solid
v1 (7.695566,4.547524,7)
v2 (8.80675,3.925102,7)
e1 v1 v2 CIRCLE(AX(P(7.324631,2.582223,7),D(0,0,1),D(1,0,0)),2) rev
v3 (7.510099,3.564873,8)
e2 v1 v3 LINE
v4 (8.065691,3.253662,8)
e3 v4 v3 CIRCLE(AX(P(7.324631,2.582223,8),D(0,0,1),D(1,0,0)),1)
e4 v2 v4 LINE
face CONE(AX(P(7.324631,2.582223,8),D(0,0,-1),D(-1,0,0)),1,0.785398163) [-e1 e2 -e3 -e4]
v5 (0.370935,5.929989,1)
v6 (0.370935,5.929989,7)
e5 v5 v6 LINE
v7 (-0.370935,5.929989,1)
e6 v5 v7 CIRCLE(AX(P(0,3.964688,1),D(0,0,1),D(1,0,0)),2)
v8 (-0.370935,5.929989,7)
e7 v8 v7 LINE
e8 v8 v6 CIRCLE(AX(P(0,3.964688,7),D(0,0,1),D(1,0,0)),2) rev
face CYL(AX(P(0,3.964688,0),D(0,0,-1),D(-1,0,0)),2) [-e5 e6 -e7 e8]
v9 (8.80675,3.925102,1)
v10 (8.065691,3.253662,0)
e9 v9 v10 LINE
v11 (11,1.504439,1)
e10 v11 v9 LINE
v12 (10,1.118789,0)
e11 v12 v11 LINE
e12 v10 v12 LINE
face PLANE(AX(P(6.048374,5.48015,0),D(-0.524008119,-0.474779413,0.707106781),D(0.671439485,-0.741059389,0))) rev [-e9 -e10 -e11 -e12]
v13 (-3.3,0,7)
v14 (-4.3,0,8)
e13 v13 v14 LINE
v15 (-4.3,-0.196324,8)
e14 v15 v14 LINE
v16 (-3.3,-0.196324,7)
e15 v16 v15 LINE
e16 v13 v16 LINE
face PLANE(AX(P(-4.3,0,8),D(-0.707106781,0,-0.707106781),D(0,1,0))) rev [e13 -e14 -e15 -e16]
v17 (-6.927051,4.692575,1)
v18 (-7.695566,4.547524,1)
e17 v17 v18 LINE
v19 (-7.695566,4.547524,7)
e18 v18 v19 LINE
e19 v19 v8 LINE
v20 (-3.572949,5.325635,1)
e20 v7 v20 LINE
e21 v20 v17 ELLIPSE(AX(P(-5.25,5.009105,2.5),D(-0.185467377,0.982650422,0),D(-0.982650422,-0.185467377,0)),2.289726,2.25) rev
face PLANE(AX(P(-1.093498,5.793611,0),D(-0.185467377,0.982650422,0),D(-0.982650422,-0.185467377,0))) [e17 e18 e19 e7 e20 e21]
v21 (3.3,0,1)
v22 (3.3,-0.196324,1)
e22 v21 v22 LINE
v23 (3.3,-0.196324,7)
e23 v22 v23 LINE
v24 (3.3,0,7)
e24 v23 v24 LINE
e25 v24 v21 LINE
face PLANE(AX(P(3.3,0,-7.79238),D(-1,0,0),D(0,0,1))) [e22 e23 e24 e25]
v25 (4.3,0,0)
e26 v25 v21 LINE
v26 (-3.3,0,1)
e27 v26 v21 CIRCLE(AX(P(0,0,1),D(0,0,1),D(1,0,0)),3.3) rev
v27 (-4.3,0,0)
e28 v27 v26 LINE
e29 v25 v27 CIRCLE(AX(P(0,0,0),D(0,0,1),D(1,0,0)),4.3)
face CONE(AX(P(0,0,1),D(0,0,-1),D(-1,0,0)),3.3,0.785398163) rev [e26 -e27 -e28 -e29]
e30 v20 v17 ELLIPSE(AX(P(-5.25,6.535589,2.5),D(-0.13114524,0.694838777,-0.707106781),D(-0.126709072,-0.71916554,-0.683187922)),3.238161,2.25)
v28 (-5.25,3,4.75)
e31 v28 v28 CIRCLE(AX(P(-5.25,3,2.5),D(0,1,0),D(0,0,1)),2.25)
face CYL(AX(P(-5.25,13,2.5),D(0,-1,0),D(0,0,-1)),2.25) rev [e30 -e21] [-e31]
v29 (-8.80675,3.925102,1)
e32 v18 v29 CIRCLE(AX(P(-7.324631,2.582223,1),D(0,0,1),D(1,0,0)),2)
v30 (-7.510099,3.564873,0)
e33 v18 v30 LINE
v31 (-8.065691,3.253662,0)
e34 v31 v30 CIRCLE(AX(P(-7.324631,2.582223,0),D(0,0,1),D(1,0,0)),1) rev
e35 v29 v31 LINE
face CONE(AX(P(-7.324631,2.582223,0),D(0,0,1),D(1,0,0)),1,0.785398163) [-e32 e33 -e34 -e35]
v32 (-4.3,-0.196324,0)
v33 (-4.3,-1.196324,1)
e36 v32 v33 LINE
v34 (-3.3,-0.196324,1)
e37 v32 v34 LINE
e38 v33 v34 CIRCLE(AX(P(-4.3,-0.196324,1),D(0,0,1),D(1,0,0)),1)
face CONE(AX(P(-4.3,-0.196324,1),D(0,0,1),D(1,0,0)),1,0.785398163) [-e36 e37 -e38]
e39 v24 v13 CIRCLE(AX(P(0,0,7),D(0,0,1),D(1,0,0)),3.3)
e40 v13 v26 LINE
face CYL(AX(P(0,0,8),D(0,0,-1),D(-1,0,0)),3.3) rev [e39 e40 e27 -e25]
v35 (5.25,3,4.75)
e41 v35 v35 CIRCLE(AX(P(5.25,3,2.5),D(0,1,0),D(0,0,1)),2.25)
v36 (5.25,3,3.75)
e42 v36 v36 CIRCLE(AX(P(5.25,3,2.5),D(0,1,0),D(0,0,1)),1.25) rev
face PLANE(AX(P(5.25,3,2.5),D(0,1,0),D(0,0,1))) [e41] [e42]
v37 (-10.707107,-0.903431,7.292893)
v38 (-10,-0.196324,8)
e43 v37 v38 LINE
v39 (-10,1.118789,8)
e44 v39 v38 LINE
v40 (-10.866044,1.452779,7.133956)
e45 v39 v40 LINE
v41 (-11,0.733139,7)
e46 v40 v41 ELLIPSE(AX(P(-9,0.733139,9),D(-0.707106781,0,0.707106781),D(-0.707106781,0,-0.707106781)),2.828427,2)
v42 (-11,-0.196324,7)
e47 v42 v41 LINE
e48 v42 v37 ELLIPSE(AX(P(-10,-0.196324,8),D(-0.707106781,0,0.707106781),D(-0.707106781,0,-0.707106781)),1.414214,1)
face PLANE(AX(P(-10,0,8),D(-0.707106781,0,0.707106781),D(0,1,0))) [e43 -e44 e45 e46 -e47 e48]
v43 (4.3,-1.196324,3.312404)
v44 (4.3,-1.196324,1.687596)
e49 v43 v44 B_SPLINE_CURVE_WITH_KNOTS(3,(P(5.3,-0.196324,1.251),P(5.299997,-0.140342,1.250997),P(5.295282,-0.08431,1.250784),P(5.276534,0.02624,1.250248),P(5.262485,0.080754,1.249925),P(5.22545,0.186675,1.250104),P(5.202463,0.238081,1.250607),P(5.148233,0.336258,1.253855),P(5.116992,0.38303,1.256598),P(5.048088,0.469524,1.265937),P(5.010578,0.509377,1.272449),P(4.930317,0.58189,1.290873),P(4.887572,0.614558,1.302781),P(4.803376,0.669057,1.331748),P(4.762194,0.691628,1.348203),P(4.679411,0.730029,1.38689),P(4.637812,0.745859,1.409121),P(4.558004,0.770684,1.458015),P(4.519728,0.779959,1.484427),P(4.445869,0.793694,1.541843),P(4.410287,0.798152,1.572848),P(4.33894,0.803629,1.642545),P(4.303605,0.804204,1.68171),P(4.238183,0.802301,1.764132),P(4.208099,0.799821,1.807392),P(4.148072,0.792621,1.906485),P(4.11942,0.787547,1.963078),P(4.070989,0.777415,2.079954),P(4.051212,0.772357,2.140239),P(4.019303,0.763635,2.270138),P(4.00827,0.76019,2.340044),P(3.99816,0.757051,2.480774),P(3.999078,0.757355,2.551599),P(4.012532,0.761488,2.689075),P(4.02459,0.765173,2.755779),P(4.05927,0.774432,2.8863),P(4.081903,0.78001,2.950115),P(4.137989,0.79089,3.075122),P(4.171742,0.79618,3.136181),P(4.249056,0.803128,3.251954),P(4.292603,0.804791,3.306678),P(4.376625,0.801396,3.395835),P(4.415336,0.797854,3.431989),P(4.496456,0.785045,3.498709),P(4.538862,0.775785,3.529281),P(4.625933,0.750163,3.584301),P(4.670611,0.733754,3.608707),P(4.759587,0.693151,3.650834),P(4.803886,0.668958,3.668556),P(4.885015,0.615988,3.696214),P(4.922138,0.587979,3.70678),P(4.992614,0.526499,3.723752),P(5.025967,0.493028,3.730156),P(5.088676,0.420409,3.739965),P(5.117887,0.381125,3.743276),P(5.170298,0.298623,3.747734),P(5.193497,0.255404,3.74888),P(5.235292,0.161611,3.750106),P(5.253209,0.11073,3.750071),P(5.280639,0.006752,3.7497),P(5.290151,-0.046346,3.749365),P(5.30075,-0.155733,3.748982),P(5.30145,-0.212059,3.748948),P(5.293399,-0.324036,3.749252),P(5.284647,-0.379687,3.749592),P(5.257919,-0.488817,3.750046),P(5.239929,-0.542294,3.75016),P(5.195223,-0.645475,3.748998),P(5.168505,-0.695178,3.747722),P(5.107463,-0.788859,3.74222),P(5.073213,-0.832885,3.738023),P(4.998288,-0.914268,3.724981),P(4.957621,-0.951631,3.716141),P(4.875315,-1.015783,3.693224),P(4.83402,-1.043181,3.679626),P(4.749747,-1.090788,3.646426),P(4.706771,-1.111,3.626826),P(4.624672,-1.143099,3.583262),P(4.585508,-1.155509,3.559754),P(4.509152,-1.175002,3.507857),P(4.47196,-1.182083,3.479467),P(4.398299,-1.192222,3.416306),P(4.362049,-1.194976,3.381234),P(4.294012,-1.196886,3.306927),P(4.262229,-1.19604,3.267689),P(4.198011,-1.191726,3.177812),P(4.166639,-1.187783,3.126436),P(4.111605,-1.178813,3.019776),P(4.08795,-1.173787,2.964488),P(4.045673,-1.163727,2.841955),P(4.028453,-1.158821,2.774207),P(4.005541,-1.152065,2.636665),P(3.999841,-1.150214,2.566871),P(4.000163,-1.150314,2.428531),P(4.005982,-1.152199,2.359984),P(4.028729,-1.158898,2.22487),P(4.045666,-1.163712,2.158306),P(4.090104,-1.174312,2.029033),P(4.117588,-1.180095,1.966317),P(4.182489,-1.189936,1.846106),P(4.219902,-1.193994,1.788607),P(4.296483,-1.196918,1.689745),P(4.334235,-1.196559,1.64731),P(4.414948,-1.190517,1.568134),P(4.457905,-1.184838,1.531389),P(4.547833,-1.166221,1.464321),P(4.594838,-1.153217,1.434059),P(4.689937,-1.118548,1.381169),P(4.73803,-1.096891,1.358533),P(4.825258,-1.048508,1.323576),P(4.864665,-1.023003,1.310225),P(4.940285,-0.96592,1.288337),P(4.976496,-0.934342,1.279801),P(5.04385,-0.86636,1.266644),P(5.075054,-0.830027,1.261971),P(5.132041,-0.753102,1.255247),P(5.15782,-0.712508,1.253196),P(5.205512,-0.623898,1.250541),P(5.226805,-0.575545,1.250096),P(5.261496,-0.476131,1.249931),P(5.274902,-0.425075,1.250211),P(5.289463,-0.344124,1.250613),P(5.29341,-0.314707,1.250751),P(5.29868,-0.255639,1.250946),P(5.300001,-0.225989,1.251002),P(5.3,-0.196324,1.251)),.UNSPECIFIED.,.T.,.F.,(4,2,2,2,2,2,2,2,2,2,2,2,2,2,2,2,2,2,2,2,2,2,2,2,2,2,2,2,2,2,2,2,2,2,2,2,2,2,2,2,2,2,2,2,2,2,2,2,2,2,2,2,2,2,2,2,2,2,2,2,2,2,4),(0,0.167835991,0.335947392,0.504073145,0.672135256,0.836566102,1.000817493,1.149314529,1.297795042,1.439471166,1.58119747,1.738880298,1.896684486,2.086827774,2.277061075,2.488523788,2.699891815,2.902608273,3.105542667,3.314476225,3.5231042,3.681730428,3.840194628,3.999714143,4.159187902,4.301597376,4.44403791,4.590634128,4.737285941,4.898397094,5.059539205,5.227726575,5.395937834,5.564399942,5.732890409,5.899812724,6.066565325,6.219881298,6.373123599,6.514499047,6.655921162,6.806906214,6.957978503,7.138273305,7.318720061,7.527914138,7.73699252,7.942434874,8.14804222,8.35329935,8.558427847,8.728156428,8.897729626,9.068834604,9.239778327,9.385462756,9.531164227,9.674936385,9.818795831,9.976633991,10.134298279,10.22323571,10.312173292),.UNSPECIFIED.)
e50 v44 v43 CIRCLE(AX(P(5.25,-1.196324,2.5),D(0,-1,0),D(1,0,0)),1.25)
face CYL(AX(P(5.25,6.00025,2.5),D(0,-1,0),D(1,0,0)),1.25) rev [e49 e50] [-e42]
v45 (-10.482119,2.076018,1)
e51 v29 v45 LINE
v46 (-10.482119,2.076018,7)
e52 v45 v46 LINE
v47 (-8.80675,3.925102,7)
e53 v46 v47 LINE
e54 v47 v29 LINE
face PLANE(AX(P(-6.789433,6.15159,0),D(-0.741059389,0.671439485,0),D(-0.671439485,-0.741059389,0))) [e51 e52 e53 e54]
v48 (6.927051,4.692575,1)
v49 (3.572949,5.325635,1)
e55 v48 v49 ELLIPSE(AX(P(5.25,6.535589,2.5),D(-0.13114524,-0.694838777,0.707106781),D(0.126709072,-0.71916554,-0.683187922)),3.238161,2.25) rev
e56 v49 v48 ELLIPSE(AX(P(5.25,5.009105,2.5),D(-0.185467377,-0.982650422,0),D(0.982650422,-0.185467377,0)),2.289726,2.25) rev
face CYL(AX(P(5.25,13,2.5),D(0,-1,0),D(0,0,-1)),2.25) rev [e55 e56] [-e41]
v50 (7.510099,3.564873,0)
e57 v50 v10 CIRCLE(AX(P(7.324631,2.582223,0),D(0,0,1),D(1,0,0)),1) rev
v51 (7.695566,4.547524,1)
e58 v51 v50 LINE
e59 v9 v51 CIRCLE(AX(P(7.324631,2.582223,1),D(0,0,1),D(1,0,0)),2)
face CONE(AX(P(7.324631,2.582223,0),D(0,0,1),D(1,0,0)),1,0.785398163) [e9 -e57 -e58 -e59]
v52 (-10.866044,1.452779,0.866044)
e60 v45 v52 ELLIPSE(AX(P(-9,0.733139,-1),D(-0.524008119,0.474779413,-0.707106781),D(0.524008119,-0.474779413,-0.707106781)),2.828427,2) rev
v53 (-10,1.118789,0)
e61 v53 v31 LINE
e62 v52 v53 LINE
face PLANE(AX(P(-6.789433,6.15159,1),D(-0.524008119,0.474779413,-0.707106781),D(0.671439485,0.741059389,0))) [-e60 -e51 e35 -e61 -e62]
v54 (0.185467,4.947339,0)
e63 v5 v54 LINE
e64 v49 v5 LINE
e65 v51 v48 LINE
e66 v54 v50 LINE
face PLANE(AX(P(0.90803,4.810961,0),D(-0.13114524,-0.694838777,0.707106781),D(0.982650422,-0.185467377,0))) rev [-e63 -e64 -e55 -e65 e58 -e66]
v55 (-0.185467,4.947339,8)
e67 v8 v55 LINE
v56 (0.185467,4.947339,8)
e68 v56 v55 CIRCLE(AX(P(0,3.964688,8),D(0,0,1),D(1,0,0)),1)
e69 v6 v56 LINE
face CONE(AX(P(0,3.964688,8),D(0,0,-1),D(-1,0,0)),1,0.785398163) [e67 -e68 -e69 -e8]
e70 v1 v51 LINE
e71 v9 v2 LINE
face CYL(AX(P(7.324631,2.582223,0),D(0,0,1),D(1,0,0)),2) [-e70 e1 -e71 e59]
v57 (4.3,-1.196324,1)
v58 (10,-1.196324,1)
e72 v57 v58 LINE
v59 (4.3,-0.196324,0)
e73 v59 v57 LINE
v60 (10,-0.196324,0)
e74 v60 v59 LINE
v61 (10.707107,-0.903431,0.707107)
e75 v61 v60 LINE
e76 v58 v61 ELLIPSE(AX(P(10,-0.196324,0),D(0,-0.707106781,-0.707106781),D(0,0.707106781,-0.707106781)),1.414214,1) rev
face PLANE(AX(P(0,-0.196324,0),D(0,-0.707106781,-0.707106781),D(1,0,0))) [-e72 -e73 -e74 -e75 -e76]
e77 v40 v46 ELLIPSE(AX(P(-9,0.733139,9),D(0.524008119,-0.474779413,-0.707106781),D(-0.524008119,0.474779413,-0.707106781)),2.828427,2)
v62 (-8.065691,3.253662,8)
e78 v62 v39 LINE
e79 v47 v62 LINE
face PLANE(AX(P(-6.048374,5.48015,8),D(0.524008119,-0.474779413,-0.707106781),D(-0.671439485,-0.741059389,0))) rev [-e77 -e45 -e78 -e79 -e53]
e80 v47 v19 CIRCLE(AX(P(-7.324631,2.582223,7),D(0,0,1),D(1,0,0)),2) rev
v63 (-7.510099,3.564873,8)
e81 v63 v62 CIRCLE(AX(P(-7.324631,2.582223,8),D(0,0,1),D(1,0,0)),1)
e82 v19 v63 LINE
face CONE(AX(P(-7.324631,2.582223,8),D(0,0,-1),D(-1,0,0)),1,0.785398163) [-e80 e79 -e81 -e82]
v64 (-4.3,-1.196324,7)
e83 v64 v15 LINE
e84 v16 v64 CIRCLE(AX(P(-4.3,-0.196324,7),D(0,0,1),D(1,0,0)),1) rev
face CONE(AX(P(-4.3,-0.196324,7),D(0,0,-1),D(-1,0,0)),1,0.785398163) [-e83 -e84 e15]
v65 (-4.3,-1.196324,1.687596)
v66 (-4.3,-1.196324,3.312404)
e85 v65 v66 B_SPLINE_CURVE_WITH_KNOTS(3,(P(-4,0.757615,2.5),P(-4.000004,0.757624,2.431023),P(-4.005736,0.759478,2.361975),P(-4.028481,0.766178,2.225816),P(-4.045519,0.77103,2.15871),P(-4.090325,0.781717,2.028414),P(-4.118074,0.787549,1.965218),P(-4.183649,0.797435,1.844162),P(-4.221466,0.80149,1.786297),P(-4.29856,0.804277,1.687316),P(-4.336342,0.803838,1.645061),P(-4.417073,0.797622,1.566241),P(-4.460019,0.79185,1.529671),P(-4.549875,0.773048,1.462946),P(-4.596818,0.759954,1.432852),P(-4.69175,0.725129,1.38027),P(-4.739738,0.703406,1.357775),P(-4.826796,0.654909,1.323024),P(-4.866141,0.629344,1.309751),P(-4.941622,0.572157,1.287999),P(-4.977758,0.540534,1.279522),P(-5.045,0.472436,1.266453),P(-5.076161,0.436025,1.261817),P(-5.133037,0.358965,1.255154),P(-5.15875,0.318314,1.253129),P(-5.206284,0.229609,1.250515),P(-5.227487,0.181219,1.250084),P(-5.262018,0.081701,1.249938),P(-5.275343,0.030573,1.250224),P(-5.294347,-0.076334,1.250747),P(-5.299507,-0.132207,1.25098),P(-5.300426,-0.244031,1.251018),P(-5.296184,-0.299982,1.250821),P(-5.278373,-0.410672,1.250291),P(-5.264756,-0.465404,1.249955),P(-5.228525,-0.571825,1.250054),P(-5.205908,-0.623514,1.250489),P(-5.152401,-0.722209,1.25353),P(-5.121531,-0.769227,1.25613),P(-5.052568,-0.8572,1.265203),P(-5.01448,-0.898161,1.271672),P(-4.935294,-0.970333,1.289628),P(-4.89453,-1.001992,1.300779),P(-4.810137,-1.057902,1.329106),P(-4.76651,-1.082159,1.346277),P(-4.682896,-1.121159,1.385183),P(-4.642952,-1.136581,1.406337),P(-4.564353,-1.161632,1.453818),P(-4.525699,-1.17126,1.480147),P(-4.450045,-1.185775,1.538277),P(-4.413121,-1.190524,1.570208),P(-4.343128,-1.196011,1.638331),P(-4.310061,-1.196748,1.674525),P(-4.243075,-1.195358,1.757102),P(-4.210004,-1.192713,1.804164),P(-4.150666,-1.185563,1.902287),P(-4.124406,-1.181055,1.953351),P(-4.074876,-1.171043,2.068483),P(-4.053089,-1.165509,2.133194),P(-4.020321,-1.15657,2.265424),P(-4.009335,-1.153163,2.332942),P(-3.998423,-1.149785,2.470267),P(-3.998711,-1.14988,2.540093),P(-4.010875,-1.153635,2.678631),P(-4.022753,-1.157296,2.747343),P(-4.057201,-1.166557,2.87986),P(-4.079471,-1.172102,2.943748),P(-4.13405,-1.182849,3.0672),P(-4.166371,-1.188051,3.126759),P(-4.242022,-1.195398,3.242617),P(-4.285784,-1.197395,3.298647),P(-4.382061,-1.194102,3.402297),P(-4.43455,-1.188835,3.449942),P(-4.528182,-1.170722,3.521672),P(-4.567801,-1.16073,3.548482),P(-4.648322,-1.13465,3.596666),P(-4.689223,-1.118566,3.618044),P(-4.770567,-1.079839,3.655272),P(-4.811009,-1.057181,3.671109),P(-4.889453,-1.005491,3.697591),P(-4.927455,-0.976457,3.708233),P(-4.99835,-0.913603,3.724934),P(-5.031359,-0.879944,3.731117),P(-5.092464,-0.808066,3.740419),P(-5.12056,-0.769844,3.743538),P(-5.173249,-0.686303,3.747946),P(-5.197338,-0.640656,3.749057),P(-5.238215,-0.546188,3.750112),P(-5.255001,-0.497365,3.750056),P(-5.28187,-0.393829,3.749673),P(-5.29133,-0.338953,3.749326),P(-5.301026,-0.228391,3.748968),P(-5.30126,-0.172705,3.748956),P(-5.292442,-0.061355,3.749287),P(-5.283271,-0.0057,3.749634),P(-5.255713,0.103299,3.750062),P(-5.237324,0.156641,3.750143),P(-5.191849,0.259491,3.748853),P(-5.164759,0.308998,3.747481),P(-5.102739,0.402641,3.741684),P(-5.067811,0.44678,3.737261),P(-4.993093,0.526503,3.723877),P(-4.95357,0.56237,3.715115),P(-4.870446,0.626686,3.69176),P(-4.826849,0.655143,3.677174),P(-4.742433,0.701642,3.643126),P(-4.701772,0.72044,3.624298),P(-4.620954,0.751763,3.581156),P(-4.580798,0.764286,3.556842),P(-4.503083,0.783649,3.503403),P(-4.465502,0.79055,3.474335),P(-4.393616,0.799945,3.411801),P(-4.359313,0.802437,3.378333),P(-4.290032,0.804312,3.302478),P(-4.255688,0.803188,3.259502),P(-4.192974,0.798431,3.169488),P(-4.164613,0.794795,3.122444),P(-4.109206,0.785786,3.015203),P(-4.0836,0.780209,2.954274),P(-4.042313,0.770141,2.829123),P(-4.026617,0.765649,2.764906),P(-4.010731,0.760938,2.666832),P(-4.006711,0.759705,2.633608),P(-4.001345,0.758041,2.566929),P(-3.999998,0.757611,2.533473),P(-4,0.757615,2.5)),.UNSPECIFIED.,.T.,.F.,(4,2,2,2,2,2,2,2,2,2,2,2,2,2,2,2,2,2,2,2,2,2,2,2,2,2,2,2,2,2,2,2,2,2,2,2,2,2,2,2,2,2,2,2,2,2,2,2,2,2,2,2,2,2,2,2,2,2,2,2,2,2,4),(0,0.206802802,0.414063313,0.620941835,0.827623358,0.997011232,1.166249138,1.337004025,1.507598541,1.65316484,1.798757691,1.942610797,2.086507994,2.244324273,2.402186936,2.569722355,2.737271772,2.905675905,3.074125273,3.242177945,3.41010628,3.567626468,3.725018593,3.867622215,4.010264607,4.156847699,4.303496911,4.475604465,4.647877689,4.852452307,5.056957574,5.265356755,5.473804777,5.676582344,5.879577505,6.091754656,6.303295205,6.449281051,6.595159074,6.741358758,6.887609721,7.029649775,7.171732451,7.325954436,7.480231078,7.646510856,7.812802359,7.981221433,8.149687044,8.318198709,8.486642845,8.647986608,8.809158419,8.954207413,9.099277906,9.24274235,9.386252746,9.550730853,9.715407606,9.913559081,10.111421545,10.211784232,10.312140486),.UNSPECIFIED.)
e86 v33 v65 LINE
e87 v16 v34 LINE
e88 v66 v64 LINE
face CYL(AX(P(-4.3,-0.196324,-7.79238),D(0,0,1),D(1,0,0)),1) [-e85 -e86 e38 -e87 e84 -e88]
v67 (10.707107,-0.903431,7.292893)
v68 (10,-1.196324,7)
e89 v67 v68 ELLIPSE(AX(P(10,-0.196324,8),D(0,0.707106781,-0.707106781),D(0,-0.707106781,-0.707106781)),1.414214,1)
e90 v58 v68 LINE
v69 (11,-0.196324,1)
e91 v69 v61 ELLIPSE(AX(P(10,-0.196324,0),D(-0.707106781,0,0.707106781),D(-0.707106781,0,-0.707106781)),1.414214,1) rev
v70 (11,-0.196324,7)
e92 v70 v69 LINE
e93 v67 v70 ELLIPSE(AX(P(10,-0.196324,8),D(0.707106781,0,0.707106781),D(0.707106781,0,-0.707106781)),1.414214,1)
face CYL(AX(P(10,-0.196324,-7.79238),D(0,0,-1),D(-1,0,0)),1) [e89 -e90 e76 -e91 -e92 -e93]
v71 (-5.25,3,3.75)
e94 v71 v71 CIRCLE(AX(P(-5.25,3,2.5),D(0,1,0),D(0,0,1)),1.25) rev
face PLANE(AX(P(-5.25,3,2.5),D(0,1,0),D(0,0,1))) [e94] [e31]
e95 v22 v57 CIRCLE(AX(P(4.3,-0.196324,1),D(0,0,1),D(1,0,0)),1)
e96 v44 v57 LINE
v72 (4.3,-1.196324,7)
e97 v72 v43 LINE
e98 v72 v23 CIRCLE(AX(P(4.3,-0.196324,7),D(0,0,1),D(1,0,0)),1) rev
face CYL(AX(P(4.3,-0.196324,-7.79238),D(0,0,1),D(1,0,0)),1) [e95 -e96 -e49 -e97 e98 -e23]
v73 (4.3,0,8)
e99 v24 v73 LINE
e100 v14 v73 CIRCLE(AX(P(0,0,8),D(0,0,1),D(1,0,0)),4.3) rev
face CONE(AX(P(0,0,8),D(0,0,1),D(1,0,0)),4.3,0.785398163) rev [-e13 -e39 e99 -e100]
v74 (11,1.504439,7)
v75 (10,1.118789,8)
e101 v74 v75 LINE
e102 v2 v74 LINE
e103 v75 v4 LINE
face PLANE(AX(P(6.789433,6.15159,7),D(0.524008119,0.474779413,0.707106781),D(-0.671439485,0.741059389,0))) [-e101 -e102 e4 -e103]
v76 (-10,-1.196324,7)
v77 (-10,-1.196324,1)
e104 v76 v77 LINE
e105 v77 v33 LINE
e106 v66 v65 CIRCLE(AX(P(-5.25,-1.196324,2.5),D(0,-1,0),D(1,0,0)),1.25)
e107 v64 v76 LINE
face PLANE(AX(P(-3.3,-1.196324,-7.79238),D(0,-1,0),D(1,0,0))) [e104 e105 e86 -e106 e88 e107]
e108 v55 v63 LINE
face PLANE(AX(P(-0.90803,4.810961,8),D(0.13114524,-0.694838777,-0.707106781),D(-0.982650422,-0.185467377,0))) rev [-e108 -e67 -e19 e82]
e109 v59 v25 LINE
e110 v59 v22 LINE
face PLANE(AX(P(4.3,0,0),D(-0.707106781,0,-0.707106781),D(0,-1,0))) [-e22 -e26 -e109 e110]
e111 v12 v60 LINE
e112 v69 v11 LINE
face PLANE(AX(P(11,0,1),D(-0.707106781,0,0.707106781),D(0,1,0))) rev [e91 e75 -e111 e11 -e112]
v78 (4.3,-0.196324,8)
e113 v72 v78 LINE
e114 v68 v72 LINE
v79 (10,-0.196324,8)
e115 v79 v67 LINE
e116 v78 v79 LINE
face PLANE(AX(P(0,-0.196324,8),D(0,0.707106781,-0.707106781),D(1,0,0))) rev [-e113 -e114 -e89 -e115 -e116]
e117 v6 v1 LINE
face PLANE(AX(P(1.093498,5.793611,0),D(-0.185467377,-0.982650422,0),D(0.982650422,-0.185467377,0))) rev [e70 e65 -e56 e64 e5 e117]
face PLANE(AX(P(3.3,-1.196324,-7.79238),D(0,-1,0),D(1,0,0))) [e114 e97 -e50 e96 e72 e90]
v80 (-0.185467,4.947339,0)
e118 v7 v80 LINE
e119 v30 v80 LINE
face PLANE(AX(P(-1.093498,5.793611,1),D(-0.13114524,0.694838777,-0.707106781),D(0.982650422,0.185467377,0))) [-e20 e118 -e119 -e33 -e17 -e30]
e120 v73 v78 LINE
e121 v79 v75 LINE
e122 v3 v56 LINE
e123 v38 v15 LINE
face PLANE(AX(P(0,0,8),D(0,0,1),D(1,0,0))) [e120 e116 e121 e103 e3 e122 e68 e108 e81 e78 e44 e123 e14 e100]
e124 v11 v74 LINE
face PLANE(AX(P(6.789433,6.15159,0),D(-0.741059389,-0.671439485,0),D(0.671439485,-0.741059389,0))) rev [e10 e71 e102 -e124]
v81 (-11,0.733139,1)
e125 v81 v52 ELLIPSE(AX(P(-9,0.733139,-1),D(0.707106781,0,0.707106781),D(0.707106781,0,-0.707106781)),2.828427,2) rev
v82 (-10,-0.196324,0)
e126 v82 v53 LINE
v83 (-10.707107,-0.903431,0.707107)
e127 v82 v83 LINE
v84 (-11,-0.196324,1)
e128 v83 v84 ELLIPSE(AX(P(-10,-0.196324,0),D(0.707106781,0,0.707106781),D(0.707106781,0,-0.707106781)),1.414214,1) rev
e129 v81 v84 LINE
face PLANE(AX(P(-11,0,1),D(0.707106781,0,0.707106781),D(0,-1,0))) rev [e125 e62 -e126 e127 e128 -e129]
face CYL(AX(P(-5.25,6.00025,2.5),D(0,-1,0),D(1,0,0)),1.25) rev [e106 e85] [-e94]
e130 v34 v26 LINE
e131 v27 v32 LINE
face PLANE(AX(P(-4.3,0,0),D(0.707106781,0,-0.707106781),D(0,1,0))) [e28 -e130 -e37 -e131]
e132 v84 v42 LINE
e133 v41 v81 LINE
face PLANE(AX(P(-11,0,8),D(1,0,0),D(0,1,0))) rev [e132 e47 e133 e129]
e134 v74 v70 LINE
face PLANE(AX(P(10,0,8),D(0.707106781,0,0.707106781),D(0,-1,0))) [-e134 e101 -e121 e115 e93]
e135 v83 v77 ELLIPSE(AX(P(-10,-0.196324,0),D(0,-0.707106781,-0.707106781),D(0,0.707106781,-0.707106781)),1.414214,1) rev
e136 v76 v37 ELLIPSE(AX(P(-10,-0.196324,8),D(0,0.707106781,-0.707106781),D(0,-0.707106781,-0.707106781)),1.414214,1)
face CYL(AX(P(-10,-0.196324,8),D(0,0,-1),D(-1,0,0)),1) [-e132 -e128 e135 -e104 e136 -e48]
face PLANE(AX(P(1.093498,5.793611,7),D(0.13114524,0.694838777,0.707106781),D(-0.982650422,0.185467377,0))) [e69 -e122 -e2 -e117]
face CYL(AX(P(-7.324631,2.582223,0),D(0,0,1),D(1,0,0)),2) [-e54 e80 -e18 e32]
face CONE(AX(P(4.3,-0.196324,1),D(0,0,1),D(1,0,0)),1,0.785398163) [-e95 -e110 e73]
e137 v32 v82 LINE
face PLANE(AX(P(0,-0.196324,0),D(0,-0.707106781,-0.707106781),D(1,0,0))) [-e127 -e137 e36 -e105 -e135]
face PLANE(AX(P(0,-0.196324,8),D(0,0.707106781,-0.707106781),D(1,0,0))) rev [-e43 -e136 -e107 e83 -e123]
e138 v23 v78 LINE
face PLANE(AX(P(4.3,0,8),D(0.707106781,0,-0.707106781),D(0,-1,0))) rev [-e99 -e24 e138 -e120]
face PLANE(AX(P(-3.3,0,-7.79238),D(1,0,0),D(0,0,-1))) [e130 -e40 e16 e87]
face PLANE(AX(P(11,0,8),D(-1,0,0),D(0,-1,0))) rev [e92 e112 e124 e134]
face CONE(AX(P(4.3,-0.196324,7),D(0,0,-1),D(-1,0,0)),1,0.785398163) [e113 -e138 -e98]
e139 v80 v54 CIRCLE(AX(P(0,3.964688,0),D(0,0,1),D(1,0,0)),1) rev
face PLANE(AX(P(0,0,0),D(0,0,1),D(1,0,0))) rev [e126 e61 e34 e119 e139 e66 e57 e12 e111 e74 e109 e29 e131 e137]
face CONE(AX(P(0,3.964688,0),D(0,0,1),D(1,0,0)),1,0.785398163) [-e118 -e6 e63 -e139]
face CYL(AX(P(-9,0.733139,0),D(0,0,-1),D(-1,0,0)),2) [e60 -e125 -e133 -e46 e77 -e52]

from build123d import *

# Parameters (mm, degrees)
BOSS_EXTRUDE1_DEPTH     = 8
CUT_EXTRUDE1_DEPTH      = 15.866068747
CUT_EXTRUDE1_DEPTH_BACK = 15.866068747
SKETCH3_W               = 7.7
SKETCH3_H               = 1.196323822
BOSS_EXTRUDE2_DEPTH     = 8
CHAMFER1_SIZE           = 1
FILLET1_R               = 1
SKETCH4_R               = 1.25
CUT_EXTRUDE2_DEPTH      = 16.387887332
CUT_EXTRUDE3_START      = 3
SKETCH5_R               = 2.25
CUT_EXTRUDE3_DEPTH      = 10
FILLET2_R               = 2
FILLET3_R               = 1
CHAMFER2_SIZE           = 1


# Some blends are built 0.0001 mm under size
with BuildPart() as part:
    # Sketch1 → Boss-Extrude1 (new body)
    with BuildSketch(Plane.XY):
        with BuildLine():
            Line((-3.3, 0), (-11, 0))
            Line((-11, 0), (-11, 6))
            Line((-11, 6), (11, 6))
            Line((11, 6), (11, 0))
            Line((11, 0), (3.3, 0))
            ThreePointArc((3.3, 0), (0, 3.3), (-3.3, 0))
        make_face()
    extrude(amount=BOSS_EXTRUDE1_DEPTH)

    # Sketch2 → Cut-Extrude1 (cut, two sides: drawn at the far end of the back side and taken through both)
    with BuildSketch(Plane.XY.offset(8).offset(-CUT_EXTRUDE1_DEPTH_BACK)):
        Polygon((-8.355690819, 4.422930452), (0, 6), (-11, 6), (-11, 1.504439372), align=None)
        Polygon((11, 6), (0, 6), (8.355690819, 4.422930452), (11, 1.504439372), align=None)
    extrude(amount=CUT_EXTRUDE1_DEPTH + CUT_EXTRUDE1_DEPTH_BACK, mode=Mode.SUBTRACT)

    # Sketch3 → Boss-Extrude2 (add)
    with BuildSketch(Plane.XY.offset(8)):
        with Locations((-7.15, -0.598161911)):
            Rectangle(SKETCH3_W, SKETCH3_H)
        with Locations((7.15, -0.598161911)):
            Rectangle(SKETCH3_W, SKETCH3_H)
    extrude(amount=-BOSS_EXTRUDE2_DEPTH)

    # Chamfer1
    chamfer1_edges = [part.edges().sort_by_distance(p)[0] for p in [
        (11, 0.154057775, 8),
        (-11, 0.154057775, 0),
        (-11, 0.154057775, 8),
        (11, 0.154057775, 0),
    ]]
    chamfer(chamfer1_edges, length=CHAMFER1_SIZE)

    # Fillet1
    fillet1_edges = [part.edges().sort_by_distance(p)[0] for p in [
        (-3.3, -1.196323822, 4),
        (3.3, -1.196323822, 4),
    ]]
    fillet(fillet1_edges, radius=FILLET1_R)

    # Sketch4 → Cut-Extrude2 (cut, through all)
    with BuildSketch(Plane.XZ.offset(1.196323822)):
        with Locations(Location((-5.25, 2.5, 0), (0, 0, 319.464197889))):
            Circle(SKETCH4_R)
        with Locations((5.25, 2.5)):
            Circle(SKETCH4_R)
    extrude(amount=-CUT_EXTRUDE2_DEPTH, mode=Mode.SUBTRACT)

    # Sketch5 → Cut-Extrude3 (cut)
    with BuildSketch(Plane(origin=(0, 0, 0), x_dir=(1, 0, 0), z_dir=(0, 1, 0)).offset(CUT_EXTRUDE3_START)):
        with Locations(Location((-5.25, -2.5, 0), (0, 0, 180))):
            Circle(SKETCH5_R)
        with Locations((5.25, -2.5)):
            Circle(SKETCH5_R)
    extrude(amount=CUT_EXTRUDE3_DEPTH, mode=Mode.SUBTRACT)

    # Fillet2
    fillet2_edges = [part.edges().sort_by_distance(p)[0] for p in [
        (8.355690819, 4.422930452, 4),
        (-8.355690819, 4.422930452, 4),
        (0, 6, 4),
        (-11, 1.504439372, 4),
    ]]
    fillet(fillet2_edges, radius=FILLET2_R)

    # Fillet3
    fillet3_edges = [part.edges().sort_by_distance(p)[0] for p in [
        (11, -1.196323822, 4),
        (-11, -1.196323822, 4),
    ]]
    fillet(fillet3_edges, radius=FILLET3_R)

    # Chamfer2
    chamfer2_edges = [part.edges().sort_by_distance(p)[0] for p in [
        (7.15, -1.196323822, 8),
        (3.592893219, -0.903430603, 8),
        (3.3, -0.098161911, 8),
        (0, 3.3, 8),
        (-3.3, -0.098161911, 8),
        (-3.592893219, -0.903430603, 8),
        (-7.15, -1.196323822, 8),
    ]]
    chamfer(chamfer2_edges, length=CHAMFER2_SIZE - 0.0001)  # a hair under: the kernel refuses the full size
    chamfer2_2_edges = [part.edges().sort_by_distance(p)[0] for p in [
        (7.15, -1.196323822, 0),
        (3.592893219, -0.903430603, 0),
        (3.3, -0.098161911, 0),
        (0, 3.3, 0),
        (-3.3, -0.098161911, 0),
        (-3.592893219, -0.903430603, 0),
        (-7.15, -1.196323822, 0),
    ]]
    chamfer(chamfer2_2_edges, length=CHAMFER2_SIZE - 0.0001)  # a hair under: the kernel refuses the full size
    # the kernel refuses this chamfer: 1 mm, written as the material it takes off along each edge
    with BuildSketch(Plane(origin=(8.806750236, 3.925101796, 0), x_dir=(-0.7407792072905057, -0.6711856247085939, -0.02749587661058639), z_dir=(0.6714394846228174, -0.7410593893133298, 0)), Plane(origin=(-11.7267295, 0.702357082, 0), x_dir=(0.7407792072905062, -0.6711856247085936, -0.02749587661058639), z_dir=(0.6714394846228171, 0.7410593893133303, 0))) as chamfer2_3_piece_1:
        with BuildLine():
            Line((1.028673195, 0), (-0.056547155, -1.027117794))
            Line((-0.056547155, -1.027117794), (-0.076539593, -1.026567876))
            ThreePointArc((-0.076539593, -1.026567876), (-0.034129227, -0.51339783), (-0.019992438, 0.000549918))
            Line((-0.019992438, 0.000549918), (0.000549918, 0.019992438))
            ThreePointArc((0.000549918, 0.019992438), (0.514497665, 0.00585565), (1.029223113, 0.019992438))
            Line((1.029223113, 0.019992438), (1.028673195, 0))
        make_face()
    extrude(amount=4.348834602, mode=Mode.SUBTRACT)
    with BuildSketch(Plane(origin=(7.324631458, 2.582222827, 0), x_dir=(0.7410593893133297, 0.6714394846228176, 0), z_dir=(0.6714394846228176, -0.7410593893133297, 0))) as chamfer2_3_piece_2:
        with BuildLine():
            Line((0.971715729, -0.028284271), (2.028284271, 1.028284271))
            Line((2.028284271, 1.028284271), (2.048284271, 1.028284271))
            ThreePointArc((2.048284271, 1.028284271), (2.02, 0.514142136), (2.02, 0))
            Line((2.02, 0), (2, -0.02))
            ThreePointArc((2, -0.02), (1.485857864, -0.02), (0.971715729, -0.048284271))
            Line((0.971715729, -0.048284271), (0.971715729, -0.028284271))
        make_face()
    revolve(axis=Axis((7.324631458, 2.582222827, 0), (0, 0, 1)), revolution_arc=37.133354948, mode=Mode.SUBTRACT)
    with BuildSketch(Plane(origin=(0.370934753, 5.929989044, 0), x_dir=(-0.18539725465470863, -0.9822788986514536, -0.02749587661058548), z_dir=(0.9826504221581788, -0.1854673767333577, 0)), Plane(origin=(-7.695566211, 4.547523671, 0), x_dir=(0.18539725465470863, -0.9822788986514536, -0.0274958766105855), z_dir=(0.9826504221581788, 0.1854673767333577, 0))) as chamfer2_3_piece_3:
        with BuildLine():
            Line((1.028673195, 0), (-0.056547155, -1.027117794))
            Line((-0.056547155, -1.027117794), (-0.076539593, -1.026567876))
            ThreePointArc((-0.076539593, -1.026567876), (-0.034129227, -0.51339783), (-0.019992438, 0.000549918))
            Line((-0.019992438, 0.000549918), (0.000549918, 0.019992438))
            ThreePointArc((0.000549918, 0.019992438), (0.514497665, 0.00585565), (1.029223113, 0.019992438))
            Line((1.029223113, 0.019992438), (1.028673195, 0))
        make_face()
    extrude(amount=7.45395442, mode=Mode.SUBTRACT)
    with BuildSketch(Plane(origin=(0, 3.964688199, 0), x_dir=(0.1854673767333581, 0.9826504221581787, 0), z_dir=(0.9826504221581787, -0.1854673767333581, 0))) as chamfer2_3_piece_4:
        with BuildLine():
            Line((0.971715729, -0.028284271), (2.028284271, 1.028284271))
            Line((2.028284271, 1.028284271), (2.048284271, 1.028284271))
            ThreePointArc((2.048284271, 1.028284271), (2.02, 0.514142136), (2.02, 0))
            Line((2.02, 0), (2, -0.02))
            ThreePointArc((2, -0.02), (1.485857864, -0.02), (0.971715729, -0.048284271))
            Line((0.971715729, -0.048284271), (0.971715729, -0.028284271))
        make_face()
    revolve(axis=Axis((0, 3.964688199, 0), (0, 0, 1)), revolution_arc=21.376765384, mode=Mode.SUBTRACT)
    with BuildSketch(Plane(origin=(-7.324631458, 2.582222827, 0), x_dir=(-0.1854673767333579, 0.9826504221581787, 0), z_dir=(0.9826504221581787, 0.1854673767333579, 0))) as chamfer2_3_piece_5:
        with BuildLine():
            Line((0.971715729, -0.028284271), (2.028284271, 1.028284271))
            Line((2.028284271, 1.028284271), (2.048284271, 1.028284271))
            ThreePointArc((2.048284271, 1.028284271), (2.02, 0.514142136), (2.02, 0))
            Line((2.02, 0), (2, -0.02))
            ThreePointArc((2, -0.02), (1.485857864, -0.02), (0.971715729, -0.048284271))
            Line((0.971715729, -0.048284271), (0.971715729, -0.028284271))
        make_face()
    revolve(axis=Axis((-7.324631458, 2.582222827, 0), (0, 0, 1)), revolution_arc=37.133354948, mode=Mode.SUBTRACT)
    # the kernel refuses this chamfer: 1 mm, written as the material it takes off along each edge
    with BuildSketch(Plane(origin=(8.806750236, 3.925101796, 8), x_dir=(-0.7407792072905057, -0.6711856247085939, 0.02749587661058564), z_dir=(0.6714394846228174, -0.7410593893133298, 0)), Plane(origin=(-11.7267295, 0.702357082, 8), x_dir=(0.740779207290506, -0.6711856247085934, 0.027495876610585612), z_dir=(0.6714394846228171, 0.7410593893133303, 0))) as chamfer2_4_piece_1:
        with BuildLine():
            Line((1.028673195, 0), (-0.056547155, 1.027117794))
            Line((-0.056547155, 1.027117794), (-0.076539593, 1.026567876))
            ThreePointArc((-0.076539593, 1.026567876), (-0.034129227, 0.51339783), (-0.019992438, -0.000549918))
            Line((-0.019992438, -0.000549918), (0.000549918, -0.019992438))
            ThreePointArc((0.000549918, -0.019992438), (0.514497665, -0.00585565), (1.029223113, -0.019992438))
            Line((1.029223113, -0.019992438), (1.028673195, 0))
        make_face()
    extrude(amount=4.348834602, mode=Mode.SUBTRACT)
    with BuildSketch(Plane(origin=(7.324631458, 2.582222827, 8), x_dir=(0.7410593893133297, 0.6714394846228176, 0), z_dir=(0.6714394846228176, -0.7410593893133297, 0))) as chamfer2_4_piece_2:
        with BuildLine():
            Line((0.971715729, 0.028284271), (2.028284271, -1.028284271))
            Line((2.028284271, -1.028284271), (2.048284271, -1.028284271))
            ThreePointArc((2.048284271, -1.028284271), (2.02, -0.514142136), (2.02, 0))
            Line((2.02, 0), (2, 0.02))
            ThreePointArc((2, 0.02), (1.485857864, 0.02), (0.971715729, 0.048284271))
            Line((0.971715729, 0.048284271), (0.971715729, 0.028284271))
        make_face()
    revolve(axis=Axis((7.324631458, 2.582222827, 8), (0, 0, 1)), revolution_arc=37.133354948, mode=Mode.SUBTRACT)
    with BuildSketch(Plane(origin=(0.370934753, 5.929989044, 8), x_dir=(-0.18539725465470863, -0.9822788986514536, 0.027495876610585605), z_dir=(0.9826504221581788, -0.1854673767333577, 0)), Plane(origin=(-7.695566211, 4.547523671, 8), x_dir=(0.18539725465470863, -0.9822788986514536, 0.02749587661058563), z_dir=(0.9826504221581788, 0.1854673767333577, 0))) as chamfer2_4_piece_3:
        with BuildLine():
            Line((1.028673195, 0), (-0.056547155, 1.027117794))
            Line((-0.056547155, 1.027117794), (-0.076539593, 1.026567876))
            ThreePointArc((-0.076539593, 1.026567876), (-0.034129227, 0.51339783), (-0.019992438, -0.000549918))
            Line((-0.019992438, -0.000549918), (0.000549918, -0.019992438))
            ThreePointArc((0.000549918, -0.019992438), (0.514497665, -0.00585565), (1.029223113, -0.019992438))
            Line((1.029223113, -0.019992438), (1.028673195, 0))
        make_face()
    extrude(amount=7.45395442, mode=Mode.SUBTRACT)
    with BuildSketch(Plane(origin=(0, 3.964688199, 8), x_dir=(0.1854673767333581, 0.9826504221581787, 0), z_dir=(0.9826504221581787, -0.1854673767333581, 0))) as chamfer2_4_piece_4:
        with BuildLine():
            Line((0.971715729, 0.028284271), (2.028284271, -1.028284271))
            Line((2.028284271, -1.028284271), (2.048284271, -1.028284271))
            ThreePointArc((2.048284271, -1.028284271), (2.02, -0.514142136), (2.02, 0))
            Line((2.02, 0), (2, 0.02))
            ThreePointArc((2, 0.02), (1.485857864, 0.02), (0.971715729, 0.048284271))
            Line((0.971715729, 0.048284271), (0.971715729, 0.028284271))
        make_face()
    revolve(axis=Axis((0, 3.964688199, 8), (0, 0, 1)), revolution_arc=21.376765384, mode=Mode.SUBTRACT)
    with BuildSketch(Plane(origin=(-7.324631458, 2.582222827, 8), x_dir=(-0.1854673767333579, 0.9826504221581787, 0), z_dir=(0.9826504221581787, 0.1854673767333579, 0))) as chamfer2_4_piece_5:
        with BuildLine():
            Line((0.971715729, 0.028284271), (2.028284271, -1.028284271))
            Line((2.028284271, -1.028284271), (2.048284271, -1.028284271))
            ThreePointArc((2.048284271, -1.028284271), (2.02, -0.514142136), (2.02, 0))
            Line((2.02, 0), (2, 0.02))
            ThreePointArc((2, 0.02), (1.485857864, 0.02), (0.971715729, 0.048284271))
            Line((0.971715729, 0.048284271), (0.971715729, 0.028284271))
        make_face()
    revolve(axis=Axis((-7.324631458, 2.582222827, 8), (0, 0, 1)), revolution_arc=37.133354948, mode=Mode.SUBTRACT)


solid = part.part
